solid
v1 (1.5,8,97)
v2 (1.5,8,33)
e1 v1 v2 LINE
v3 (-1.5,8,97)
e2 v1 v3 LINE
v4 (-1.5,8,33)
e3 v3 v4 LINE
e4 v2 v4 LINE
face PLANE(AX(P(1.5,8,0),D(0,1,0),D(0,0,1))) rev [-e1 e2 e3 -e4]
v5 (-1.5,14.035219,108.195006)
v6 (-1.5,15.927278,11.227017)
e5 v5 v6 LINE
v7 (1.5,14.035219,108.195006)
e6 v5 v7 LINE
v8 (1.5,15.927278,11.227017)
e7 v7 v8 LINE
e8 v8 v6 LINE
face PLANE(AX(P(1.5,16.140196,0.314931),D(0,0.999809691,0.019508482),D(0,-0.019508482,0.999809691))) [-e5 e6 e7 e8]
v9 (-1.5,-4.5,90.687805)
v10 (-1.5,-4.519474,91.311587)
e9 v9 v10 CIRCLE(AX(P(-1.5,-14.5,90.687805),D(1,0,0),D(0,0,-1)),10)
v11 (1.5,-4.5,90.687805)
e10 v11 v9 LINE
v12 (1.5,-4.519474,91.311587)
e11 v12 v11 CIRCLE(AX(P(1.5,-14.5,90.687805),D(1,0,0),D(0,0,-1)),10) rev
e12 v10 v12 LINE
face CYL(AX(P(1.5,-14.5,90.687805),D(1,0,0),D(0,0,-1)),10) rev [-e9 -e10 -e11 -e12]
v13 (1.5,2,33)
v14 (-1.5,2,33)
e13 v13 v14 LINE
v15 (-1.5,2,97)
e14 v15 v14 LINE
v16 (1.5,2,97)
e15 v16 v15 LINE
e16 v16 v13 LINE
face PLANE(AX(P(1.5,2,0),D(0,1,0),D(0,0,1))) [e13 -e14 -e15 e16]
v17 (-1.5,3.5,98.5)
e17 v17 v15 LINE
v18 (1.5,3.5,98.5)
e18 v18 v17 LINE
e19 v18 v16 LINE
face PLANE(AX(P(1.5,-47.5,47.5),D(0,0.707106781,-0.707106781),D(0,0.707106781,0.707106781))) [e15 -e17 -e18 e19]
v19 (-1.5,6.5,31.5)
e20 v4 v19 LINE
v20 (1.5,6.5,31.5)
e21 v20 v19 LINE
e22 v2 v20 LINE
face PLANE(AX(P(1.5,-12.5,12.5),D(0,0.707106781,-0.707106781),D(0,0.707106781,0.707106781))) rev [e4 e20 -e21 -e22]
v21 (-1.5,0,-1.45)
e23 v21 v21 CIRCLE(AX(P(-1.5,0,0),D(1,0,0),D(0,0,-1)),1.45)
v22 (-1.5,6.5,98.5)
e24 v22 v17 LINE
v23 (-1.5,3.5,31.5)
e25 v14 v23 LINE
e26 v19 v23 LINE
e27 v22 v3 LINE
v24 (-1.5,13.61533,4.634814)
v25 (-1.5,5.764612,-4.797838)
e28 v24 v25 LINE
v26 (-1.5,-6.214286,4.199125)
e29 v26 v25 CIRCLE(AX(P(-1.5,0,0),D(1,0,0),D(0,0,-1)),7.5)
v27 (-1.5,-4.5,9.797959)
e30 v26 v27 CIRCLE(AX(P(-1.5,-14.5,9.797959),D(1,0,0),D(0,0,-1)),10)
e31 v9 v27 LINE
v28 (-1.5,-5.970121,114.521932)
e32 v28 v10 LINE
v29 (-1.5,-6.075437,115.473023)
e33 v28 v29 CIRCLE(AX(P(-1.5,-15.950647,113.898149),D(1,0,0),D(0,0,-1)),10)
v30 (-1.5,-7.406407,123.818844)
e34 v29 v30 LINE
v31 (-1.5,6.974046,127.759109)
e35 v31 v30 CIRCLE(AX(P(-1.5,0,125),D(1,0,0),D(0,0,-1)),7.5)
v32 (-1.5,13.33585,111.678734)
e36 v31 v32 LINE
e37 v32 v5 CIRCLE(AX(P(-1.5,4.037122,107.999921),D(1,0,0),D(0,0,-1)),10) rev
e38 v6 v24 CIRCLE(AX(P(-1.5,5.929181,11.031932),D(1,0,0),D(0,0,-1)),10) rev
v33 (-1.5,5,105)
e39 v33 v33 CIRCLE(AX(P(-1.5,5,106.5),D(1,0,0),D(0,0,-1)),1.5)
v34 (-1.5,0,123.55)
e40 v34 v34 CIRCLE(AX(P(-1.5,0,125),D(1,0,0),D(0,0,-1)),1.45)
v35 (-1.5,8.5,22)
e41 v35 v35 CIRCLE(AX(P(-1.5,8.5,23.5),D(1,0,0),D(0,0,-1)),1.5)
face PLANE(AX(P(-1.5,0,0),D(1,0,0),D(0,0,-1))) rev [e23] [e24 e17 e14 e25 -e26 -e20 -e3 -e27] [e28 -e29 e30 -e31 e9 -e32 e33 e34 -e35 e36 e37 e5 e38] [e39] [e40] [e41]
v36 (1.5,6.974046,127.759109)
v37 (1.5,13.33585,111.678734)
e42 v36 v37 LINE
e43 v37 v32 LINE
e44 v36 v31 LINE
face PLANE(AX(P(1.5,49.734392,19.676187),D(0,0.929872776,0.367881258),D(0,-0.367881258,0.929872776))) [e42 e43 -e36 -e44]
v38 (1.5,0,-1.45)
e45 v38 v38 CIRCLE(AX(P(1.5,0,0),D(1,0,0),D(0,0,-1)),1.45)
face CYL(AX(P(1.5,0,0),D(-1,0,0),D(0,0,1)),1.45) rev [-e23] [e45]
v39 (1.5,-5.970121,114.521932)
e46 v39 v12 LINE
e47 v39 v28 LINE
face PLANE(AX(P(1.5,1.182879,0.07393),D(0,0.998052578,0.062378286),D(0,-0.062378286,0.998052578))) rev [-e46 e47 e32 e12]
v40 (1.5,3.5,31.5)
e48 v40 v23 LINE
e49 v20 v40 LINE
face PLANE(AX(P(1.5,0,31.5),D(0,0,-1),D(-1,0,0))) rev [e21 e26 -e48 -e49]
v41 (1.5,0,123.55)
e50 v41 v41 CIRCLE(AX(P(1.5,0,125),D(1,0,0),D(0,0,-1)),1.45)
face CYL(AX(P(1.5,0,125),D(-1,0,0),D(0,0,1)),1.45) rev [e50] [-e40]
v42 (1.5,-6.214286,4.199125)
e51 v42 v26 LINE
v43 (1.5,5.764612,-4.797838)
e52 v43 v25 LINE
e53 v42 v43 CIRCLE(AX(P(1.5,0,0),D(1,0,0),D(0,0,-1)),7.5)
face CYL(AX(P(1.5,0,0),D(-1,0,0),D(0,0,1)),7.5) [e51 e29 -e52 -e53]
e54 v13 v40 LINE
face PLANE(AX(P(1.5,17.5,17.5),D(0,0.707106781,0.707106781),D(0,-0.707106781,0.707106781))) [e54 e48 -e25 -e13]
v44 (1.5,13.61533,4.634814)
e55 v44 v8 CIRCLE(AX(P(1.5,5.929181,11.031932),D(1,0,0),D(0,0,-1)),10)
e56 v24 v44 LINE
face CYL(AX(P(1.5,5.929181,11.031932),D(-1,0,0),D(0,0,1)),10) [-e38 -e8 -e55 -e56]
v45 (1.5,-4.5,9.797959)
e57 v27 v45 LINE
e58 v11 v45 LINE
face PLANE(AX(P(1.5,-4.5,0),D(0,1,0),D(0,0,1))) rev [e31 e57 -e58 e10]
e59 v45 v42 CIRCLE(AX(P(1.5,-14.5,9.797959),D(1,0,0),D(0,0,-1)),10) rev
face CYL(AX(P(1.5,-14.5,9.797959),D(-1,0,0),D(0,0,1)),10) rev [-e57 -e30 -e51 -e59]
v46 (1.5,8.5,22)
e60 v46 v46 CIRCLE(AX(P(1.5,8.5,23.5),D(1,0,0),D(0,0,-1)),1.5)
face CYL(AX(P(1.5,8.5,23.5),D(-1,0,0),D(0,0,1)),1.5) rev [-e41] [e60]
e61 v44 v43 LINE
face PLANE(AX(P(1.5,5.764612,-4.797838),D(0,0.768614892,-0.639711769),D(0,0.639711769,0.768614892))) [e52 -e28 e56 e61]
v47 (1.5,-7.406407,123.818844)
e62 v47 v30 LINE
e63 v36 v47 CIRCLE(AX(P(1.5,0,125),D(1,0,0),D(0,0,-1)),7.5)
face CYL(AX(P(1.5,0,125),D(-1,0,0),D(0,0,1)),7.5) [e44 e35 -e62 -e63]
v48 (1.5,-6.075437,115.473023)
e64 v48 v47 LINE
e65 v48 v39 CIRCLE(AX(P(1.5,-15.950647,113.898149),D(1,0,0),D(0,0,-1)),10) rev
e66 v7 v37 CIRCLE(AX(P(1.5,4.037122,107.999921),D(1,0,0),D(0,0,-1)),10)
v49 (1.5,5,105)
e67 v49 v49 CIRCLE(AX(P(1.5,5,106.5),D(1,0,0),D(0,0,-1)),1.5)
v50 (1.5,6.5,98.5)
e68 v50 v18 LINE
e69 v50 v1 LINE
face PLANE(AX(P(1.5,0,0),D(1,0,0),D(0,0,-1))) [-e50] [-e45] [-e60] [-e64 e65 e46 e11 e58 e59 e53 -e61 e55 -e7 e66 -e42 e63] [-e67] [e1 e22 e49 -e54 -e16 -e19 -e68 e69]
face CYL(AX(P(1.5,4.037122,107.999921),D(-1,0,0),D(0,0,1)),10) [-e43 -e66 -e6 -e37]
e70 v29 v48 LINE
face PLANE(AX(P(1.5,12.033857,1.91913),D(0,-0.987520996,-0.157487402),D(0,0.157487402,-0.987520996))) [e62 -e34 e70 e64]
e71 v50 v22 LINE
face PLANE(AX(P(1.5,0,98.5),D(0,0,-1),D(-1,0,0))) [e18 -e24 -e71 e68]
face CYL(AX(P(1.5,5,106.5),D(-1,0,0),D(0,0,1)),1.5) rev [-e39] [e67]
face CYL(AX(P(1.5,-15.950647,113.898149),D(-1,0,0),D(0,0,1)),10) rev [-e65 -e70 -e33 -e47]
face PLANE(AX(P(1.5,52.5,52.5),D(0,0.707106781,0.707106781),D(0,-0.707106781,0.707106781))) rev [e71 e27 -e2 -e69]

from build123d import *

# Parameters (mm, degrees)
SKETCH1_R           = 1.45
SKETCH1_R_2         = 1.5
BOSS_EXTRUDE1_DEPTH = 1.5
FILLET1_R           = 10


with BuildPart() as part:
    # Sketch1 → Boss-Extrude1 (new, symmetric)
    with BuildSketch(Plane(origin=(0, 0, 0), x_dir=(0, 0, -1), z_dir=(1, 0, 0))):
        with BuildLine():
            Line((-110, 14), (-127.759109434, 6.974045822))
            ThreePointArc((-127.759109434, 6.974045822), (-132.233383985, -1.981957648), (-123.818844483, -7.406407472))
            Line((-123.818844483, -7.406407472), (-115, -6))
            Line((-115, -6), (-91, -4.5))
            Line((-91, -4.5), (-6, -4.5))
            ThreePointArc((-6, -4.5), (5.167384395, -5.435819948), (4.797838271, 5.764611689))
            Line((4.797838271, 5.764611689), (-7.5, 16))
            Line((-7.5, 16), (-110, 14))
        make_face()
        with Locations((-125, 0)):
            Circle(SKETCH1_R, mode=Mode.SUBTRACT)
        with Locations((-106.5, 5)):
            Circle(SKETCH1_R_2, mode=Mode.SUBTRACT)
        Polygon((-98.5, 3.5), (-98.5, 6.5), (-97, 8), (-33, 8), (-31.5, 6.5), (-31.5, 3.5), (-33, 2), (-97, 2), align=None, mode=Mode.SUBTRACT)
        with Locations((-23.5, 8.5)):
            Circle(SKETCH1_R_2, mode=Mode.SUBTRACT)
        Circle(SKETCH1_R, mode=Mode.SUBTRACT)
    extrude(amount=BOSS_EXTRUDE1_DEPTH, both=True)

    # Fillet1
    # the kernel refuses this fillet: 10 mm, written as the material it adds along each edge
    with BuildSketch(Plane(origin=(1.5, -4.5, 6), x_dir=(0, -0.6894794553430702, -0.7243052399781623), z_dir=(-1, 0, 0))) as fillet1_piece_1:
        with BuildLine():
            CenterArc((4.143912969, 9.861667083), FILLET1_R, 226.411082638, 34.04773237)
            Line((-2.750881584, 2.618614683), (0, 0))
            ThreePointArc((0, 0), (1.243173891, 0.103749688), (2.486347782, 0))
        make_face()
    extrude(amount=3)
    with BuildSketch(Plane(origin=(1.5, -4.5, 91), x_dir=(0, 0, -1), z_dir=(-1, 0, 0))) as fillet1_piece_2:
        with BuildLine():
            CenterArc((FILLET1_R * 0.0312195418814, FILLET1_R), FILLET1_R, 266.423665625, 3.576334375)
            Line((-FILLET1_R * 0.0311587442738, FILLET1_R * 0.00194742151711), (0, 0))
            Line((0, 0), (FILLET1_R * 0.0312195418814, 0))
        make_face()
    extrude(amount=3)
    with BuildSketch(Plane(origin=(-1.5, -6, 115), x_dir=(0, 0.06237828615518053, -0.9980525784828885), z_dir=(1, 0, 0))) as fillet1_piece_3:
        with BuildLine():
            CenterArc((FILLET1_R * 0.04790007143, -FILLET1_R), FILLET1_R, 90, 5.484751657)
            Line((-FILLET1_R * 0.0476807691396, -FILLET1_R * 0.00457832909063), (0, 0))
            Line((0, 0), (FILLET1_R * 0.04790007143, 0))
        make_face()
    extrude(amount=3)
    # the kernel refuses this fillet: 10 mm, written as the material it takes off along each edge
    with BuildSketch(Plane(origin=(-6.013343282, 14, 110), x_dir=(0, 0.019508481784595348, -0.99980969146056), z_dir=(1, 0, 0))) as fillet1_2_piece_1:
        with BuildLine():
            CenterArc((FILLET1_R * 0.180533731282, -FILLET1_R), FILLET1_R, 90, 20.467183595)
            Line((-FILLET1_R * 0.169137109533, -FILLET1_R * 0.063127381613), (0, 0))
            Line((0, 0), (FILLET1_R * 0.180533731282, 0))
        make_face()
    extrude(amount=12.026686564, mode=Mode.SUBTRACT)
    with BuildSketch(Plane(origin=(-10.819315302, 16, 7.5), x_dir=(0, -0.6397117694155324, -0.7686148919135308), z_dir=(1, 0, 0))) as fillet1_2_piece_2:
        with BuildLine():
            CenterArc((FILLET1_R * 0.372772612074, -FILLET1_R), FILLET1_R, 90, 40.88815481)
            Line((-FILLET1_R * 0.281811924347, -FILLET1_R * 0.244011187465), (0, 0))
            Line((0, 0), (FILLET1_R * 0.372772612074, 0))
        make_face()
    extrude(amount=21.638630604, mode=Mode.SUBTRACT)


solid = part.part
